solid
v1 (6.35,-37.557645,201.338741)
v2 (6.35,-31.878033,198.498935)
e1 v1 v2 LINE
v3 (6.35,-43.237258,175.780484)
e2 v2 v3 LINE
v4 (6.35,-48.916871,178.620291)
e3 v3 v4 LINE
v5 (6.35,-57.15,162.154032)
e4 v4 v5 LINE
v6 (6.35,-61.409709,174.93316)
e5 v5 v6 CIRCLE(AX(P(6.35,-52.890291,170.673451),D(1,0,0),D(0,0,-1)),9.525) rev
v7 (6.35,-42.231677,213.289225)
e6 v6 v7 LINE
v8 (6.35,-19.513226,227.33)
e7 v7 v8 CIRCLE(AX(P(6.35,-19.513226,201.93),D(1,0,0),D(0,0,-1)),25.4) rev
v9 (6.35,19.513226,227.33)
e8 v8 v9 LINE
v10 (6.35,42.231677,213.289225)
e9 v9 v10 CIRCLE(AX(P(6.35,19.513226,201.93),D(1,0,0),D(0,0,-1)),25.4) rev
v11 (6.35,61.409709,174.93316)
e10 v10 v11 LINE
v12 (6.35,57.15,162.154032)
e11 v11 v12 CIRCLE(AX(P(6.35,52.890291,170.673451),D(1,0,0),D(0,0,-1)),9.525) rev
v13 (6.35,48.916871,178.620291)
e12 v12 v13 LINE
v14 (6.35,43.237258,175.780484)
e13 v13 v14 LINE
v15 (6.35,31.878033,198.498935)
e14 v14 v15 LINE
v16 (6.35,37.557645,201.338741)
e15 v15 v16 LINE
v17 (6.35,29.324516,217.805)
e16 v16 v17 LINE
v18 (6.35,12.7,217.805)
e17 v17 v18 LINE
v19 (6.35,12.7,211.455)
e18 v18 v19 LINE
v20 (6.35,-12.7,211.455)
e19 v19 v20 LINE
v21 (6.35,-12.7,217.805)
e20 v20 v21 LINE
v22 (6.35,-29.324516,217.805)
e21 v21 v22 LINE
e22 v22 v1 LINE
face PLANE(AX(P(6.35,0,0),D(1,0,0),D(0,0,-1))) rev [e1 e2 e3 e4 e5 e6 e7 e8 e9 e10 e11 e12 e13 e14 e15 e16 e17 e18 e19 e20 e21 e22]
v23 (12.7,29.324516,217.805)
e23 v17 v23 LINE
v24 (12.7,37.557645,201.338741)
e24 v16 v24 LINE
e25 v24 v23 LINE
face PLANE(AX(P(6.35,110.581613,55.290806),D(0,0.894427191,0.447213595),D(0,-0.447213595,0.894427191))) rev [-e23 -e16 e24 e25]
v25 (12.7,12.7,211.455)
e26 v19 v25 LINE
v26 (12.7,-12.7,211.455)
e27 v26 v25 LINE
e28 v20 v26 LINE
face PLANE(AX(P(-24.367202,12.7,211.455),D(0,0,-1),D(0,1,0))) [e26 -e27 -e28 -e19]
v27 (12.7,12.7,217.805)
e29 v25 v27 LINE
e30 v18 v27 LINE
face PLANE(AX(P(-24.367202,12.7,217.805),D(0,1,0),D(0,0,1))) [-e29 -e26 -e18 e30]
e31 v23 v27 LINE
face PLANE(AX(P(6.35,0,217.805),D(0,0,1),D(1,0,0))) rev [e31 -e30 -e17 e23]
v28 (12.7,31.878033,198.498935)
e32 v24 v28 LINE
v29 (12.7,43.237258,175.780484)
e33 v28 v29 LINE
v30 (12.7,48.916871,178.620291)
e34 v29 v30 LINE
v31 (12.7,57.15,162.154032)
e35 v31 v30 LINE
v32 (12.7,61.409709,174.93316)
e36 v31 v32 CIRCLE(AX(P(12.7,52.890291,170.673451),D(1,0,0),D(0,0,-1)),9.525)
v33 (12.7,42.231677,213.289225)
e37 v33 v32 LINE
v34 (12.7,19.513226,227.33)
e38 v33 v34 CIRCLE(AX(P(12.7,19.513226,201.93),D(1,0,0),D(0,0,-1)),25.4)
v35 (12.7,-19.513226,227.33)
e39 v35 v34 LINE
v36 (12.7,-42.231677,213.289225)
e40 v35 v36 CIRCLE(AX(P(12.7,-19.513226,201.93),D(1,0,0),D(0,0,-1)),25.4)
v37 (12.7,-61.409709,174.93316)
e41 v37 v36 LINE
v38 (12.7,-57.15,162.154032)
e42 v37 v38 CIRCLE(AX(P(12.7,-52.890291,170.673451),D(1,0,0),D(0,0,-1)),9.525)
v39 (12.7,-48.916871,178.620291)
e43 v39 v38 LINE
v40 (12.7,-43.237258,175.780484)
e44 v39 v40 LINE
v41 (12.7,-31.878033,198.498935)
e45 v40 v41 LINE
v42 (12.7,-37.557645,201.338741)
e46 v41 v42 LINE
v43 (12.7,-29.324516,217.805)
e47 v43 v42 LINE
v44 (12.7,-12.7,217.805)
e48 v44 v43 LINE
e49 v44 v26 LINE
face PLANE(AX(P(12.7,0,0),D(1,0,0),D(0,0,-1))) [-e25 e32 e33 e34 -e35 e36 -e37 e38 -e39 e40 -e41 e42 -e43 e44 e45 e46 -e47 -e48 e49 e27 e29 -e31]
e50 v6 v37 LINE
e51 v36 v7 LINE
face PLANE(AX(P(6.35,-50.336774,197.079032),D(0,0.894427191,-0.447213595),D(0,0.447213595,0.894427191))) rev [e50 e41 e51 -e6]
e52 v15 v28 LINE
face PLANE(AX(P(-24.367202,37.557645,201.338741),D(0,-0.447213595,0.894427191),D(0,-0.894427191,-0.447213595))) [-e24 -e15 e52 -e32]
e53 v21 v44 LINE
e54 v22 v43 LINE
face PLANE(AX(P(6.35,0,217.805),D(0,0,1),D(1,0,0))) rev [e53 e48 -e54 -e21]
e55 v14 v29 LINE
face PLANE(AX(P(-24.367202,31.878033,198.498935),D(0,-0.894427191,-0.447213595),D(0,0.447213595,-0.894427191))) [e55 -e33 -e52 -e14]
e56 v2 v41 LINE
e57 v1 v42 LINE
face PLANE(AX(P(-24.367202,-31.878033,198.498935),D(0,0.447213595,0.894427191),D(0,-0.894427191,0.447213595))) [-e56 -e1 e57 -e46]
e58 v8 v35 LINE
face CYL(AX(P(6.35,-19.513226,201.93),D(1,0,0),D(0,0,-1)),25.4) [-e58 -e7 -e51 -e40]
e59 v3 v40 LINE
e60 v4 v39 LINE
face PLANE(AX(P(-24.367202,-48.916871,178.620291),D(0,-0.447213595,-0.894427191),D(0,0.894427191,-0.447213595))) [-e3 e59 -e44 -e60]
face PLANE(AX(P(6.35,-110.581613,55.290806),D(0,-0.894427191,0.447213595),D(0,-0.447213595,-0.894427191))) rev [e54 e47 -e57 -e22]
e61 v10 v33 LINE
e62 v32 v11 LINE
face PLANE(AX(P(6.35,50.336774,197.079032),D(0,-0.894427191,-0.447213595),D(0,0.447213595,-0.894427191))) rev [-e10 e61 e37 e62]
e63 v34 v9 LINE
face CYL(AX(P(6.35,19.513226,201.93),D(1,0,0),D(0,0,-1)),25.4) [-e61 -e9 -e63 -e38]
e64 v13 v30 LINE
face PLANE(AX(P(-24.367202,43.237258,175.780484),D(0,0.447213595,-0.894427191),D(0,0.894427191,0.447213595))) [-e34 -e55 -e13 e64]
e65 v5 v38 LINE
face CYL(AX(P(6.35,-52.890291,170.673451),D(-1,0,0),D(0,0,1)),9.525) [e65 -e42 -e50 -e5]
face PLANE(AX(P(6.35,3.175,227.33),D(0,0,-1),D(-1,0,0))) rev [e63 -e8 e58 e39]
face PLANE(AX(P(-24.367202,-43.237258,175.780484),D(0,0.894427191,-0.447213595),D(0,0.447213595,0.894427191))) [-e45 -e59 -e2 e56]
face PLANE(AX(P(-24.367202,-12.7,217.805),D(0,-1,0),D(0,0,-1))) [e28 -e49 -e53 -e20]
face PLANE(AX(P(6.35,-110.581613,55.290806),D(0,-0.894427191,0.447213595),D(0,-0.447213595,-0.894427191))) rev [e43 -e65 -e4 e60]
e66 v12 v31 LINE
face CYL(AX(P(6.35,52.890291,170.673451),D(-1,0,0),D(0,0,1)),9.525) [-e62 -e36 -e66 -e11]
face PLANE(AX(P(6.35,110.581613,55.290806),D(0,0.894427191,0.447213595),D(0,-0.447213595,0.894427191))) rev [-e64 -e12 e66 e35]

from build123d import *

# Parameters (mm, degrees)
SKETCH1_R             = 7.9375
SKETCH1_R_2           = 11.1125
BOSS_EXTRUDE1_DEPTH   = 12.7
F_8_CLEARANCE_HOLE1_D = 4.4958
SKETCH5_R             = 18.415
CUT_EXTRUDE1_DEPTH    = 218.842023092
SKETCH7_R             = 9.525
CUT_EXTRUDE2_DEPTH    = 218.842023092
CUT_EXTRUDE3_DEPTH    = 218.842023092
BOSS_EXTRUDE2_DEPTH   = 12.7
CUT_EXTRUDE4_DEPTH    = 218.842023092
SKETCH11_W            = 12.7
SKETCH11_H            = 178.054
CUT_EXTRUDE5_DEPTH    = 3.175
BOSS_EXTRUDE3_DEPTH   = 6.35
CUT_EXTRUDE6_DEPTH    = 253.498549798
FILLET1_R             = 12.7
SKETCH16_W            = 6.35
SKETCH16_H            = 25.4
BOSS_EXTRUDE4_DEPTH   = 6.35
CUT_EXTRUDE7_DEPTH    = 253.258895086
FILLET2_R             = 9.525
FILLET3_R             = 25.4


with BuildPart() as part:
    # Sketch1 → Boss-Extrude1 (new body)
    with BuildSketch(Plane(origin=(0, 0, 0), x_dir=(0, 0, -1), z_dir=(1, 0, 0))):
        with BuildLine():
            Line((93.345, 0), (55.245, 50.8))
            Line((55.245, 50.8), (-160.655, 50.8))
            ThreePointArc((-160.655, 50.8), (-211.455, 0), (-160.655, -50.8))
            Line((-160.655, -50.8), (55.245, -50.8))
            Line((55.245, -50.8), (93.345, 0))
        make_face()
        with Locations((-88.9, 0)):
            Circle(SKETCH1_R, mode=Mode.SUBTRACT)
        with Locations((-38.1, 0)):
            Circle(SKETCH1_R, mode=Mode.SUBTRACT)
        with Locations((-160.655, 0)):
            Circle(SKETCH1_R_2, mode=Mode.SUBTRACT)
        Circle(SKETCH1_R, mode=Mode.SUBTRACT)
    extrude(amount=BOSS_EXTRUDE1_DEPTH)

    # #8 Clearance Hole1 (through all)
    with Locations(Plane.ZY):
        with Locations((-17.691104559, 17.691104559), (17.691104559, 17.691104559), (17.691104559, -17.691104559), (-17.691104559, -17.691104559)):
            Hole(F_8_CLEARANCE_HOLE1_D / 2)

    # Sketch5 → Cut-Extrude1 (cut, through all)
    with BuildSketch(Plane.ZY):
        Circle(SKETCH5_R)
    extrude(amount=-CUT_EXTRUDE1_DEPTH, mode=Mode.SUBTRACT)

    # Sketch7 → Cut-Extrude2 (cut, through all)
    with BuildSketch(Plane.ZY):
        with Locations((-55.245, 0)):
            Circle(SKETCH7_R)
    extrude(amount=-CUT_EXTRUDE2_DEPTH, mode=Mode.SUBTRACT)

    # Sketch8 → Cut-Extrude3 (cut, through all)
    with BuildSketch(Plane(origin=(12.7, 0, 0), x_dir=(0, 0, -1), z_dir=(1, 0, 0))):
        Polygon((-160.655, 50.8), (-211.455, 25.4), (-211.455, -25.4), (-160.655, -50.8), (-233.239745749, -50.8), (-233.239745749, 50.8), align=None)
    extrude(amount=-CUT_EXTRUDE3_DEPTH, mode=Mode.SUBTRACT)

    # Sketch9 → Boss-Extrude2 (add)
    with BuildSketch(Plane(origin=(12.7, 0, 0), x_dir=(0, 0, -1), z_dir=(1, 0, 0))):
        Polygon((-160.655, 50.8), (-211.455, 25.4), (-211.455, 0), (-211.455, -25.4), (-160.655, -50.8), (-160.655, -40.64), (-202.749323348, 0), (-160.655, 40.64), align=None)
    extrude(amount=-BOSS_EXTRUDE2_DEPTH)

    # Sketch10 → Cut-Extrude4 (cut, through all)
    with BuildSketch(Plane.ZY):
        Polygon((-79.0575, -19.05), (-79.0575, 19.05), (-93.345, 0), align=None)
    extrude(amount=-CUT_EXTRUDE4_DEPTH, mode=Mode.SUBTRACT)

    # Sketch11 → Cut-Extrude5 (cut)
    with BuildSketch(Plane(origin=(0, 50.8, 0), x_dir=(1, 0, 0), z_dir=(0, 1, 0))):
        with Locations((6.35, -52.705)):
            Rectangle(SKETCH11_W, SKETCH11_H)
    cut_extrude5 = extrude(amount=-CUT_EXTRUDE5_DEPTH, mode=Mode.SUBTRACT)

    # Mirror1: Cut-Extrude5 across plane
    add(cut_extrude5.mirror(Plane.ZX), mode=Mode.SUBTRACT)

    # Sketch13 → Cut-Extrude6 (cut, through all)
    with BuildSketch(Plane(origin=(12.7, 0, 0), x_dir=(0, 0, -1), z_dir=(1, 0, 0))):
        Polygon((-161.254612663, -53.34), (-139.192, -53.34), (-139.192, -50.165), (33.782, -50.165), (33.782, -53.34), (56.515, -53.34), (81.5975, -19.896666667), (81.5975, 19.896666667), (56.515, 53.34), (33.782, 53.34), (33.782, 50.165), (-139.192, 50.165), (-139.192, 53.34), (-161.254612663, 53.34), (-213.995, 26.969806331), (-213.995, -26.969806331), align=None)
    extrude(amount=-CUT_EXTRUDE6_DEPTH, mode=Mode.SUBTRACT)


with BuildPart() as body_2:
    # Sketch12 → Boss-Extrude3 (new body)
    with BuildSketch(Plane(origin=(12.7, 0, 0), x_dir=(0, 0, -1), z_dir=(1, 0, 0))):
        with BuildLine():
            ThreePointArc((-211.89681554, -56.397839854), (-236.855, 0), (-211.89681554, 56.397839854))
            Line((-211.89681554, 56.397839854), (-243.205, 43.989212666))
            Line((-243.205, 43.989212666), (-243.205, -43.989212666))
            Line((-243.205, -43.989212666), (-211.89681554, -56.397839854))
        make_face()
        with BuildLine():
            Line((-217.805, 29.324515829), (-162.154031657, 57.15))
            Line((-162.154031657, 57.15), (-166.916531657, 66.675))
            Line((-166.916531657, 66.675), (-185.966531657, 66.675))
            Line((-185.966531657, 66.675), (-211.89681554, 56.397839854))
            ThreePointArc((-211.89681554, 56.397839854), (-236.855, 0), (-211.89681554, -56.397839854))
            Line((-211.89681554, -56.397839854), (-185.966531657, -66.675))
            Line((-185.966531657, -66.675), (-166.916531657, -66.675))
            Line((-166.916531657, -66.675), (-162.154031657, -57.15))
            Line((-162.154031657, -57.15), (-217.805, -29.324515829))
            Line((-217.805, -29.324515829), (-217.805, 29.324515829))
        make_face()
    extrude(amount=-BOSS_EXTRUDE3_DEPTH)

    # Fillet1
    fillet1_edges = [body_2.edges().sort_by_distance(p)[0] for p in [
        (9.525, -43.989212666, 243.205),
        (9.525, 43.989212666, 243.205),
        (9.525, 66.675, 185.966531657),
        (9.525, 66.675, 166.916531657),
        (9.525, -66.675, 166.916531657),
        (9.525, -66.675, 185.966531657),
    ]]
    fillet(fillet1_edges, radius=FILLET1_R)

    # Sketch16 → Boss-Extrude4 (add)
    with BuildSketch(Plane(origin=(12.7, 0, 0), x_dir=(0, 0, -1), z_dir=(1, 0, 0))):
        with Locations((-214.63, 0)):
            Rectangle(SKETCH16_W, SKETCH16_H)
        Polygon((-178.620290503, -48.916870577), (-175.780484171, -43.237257914), (-198.498934823, -31.878032589), (-201.338741154, -37.557645251), align=None)
        Polygon((-201.338741154, 37.557645251), (-198.498934823, 31.878032589), (-175.780484171, 43.237257914), (-178.620290503, 48.916870577), align=None)
    extrude(amount=-BOSS_EXTRUDE4_DEPTH)

    # Sketch17 → Cut-Extrude7 (cut, through all)
    with BuildSketch(Plane(origin=(12.7, 0, 0), x_dir=(0, 0, -1), z_dir=(1, 0, 0))):
        with BuildLine():
            Line((-174.765563314, 66.675), (-183.541544079, 66.675))
            ThreePointArc((-183.541544079, 66.675), (-185.923497883, 66.44962609), (-188.220911491, 65.781503319))
            Line((-188.220911491, 65.781503319), (-235.184367412, 47.168095163))
            ThreePointArc((-235.184367412, 47.168095163), (-241.010188388, 42.498188858), (-243.205, 35.361591844))
            Line((-243.205, 35.361591844), (-243.205, -35.361591844))
            ThreePointArc((-243.205, -35.361591844), (-241.010188388, -42.498188858), (-235.184367412, -47.168095163))
            Line((-235.184367412, -47.168095163), (-188.220911491, -65.781503319))
            ThreePointArc((-188.220911491, -65.781503319), (-185.923497883, -66.44962609), (-183.541544079, -66.675))
            Line((-183.541544079, -66.675), (-174.765563314, -66.675))
            ThreePointArc((-174.765563314, -66.675), (-171.322248813, -66.199303058), (-168.136883002, -64.80784807))
            Line((-168.136883002, -64.80784807), (-197.079031657, -50.336773743))
            Line((-197.079031657, -50.336773743), (-227.33, -35.211289571))
            Line((-227.33, -35.211289571), (-227.33, -3.175))
            Line((-227.33, -3.175), (-227.33, 3.175))
            Line((-227.33, 3.175), (-227.33, 35.211289571))
            Line((-227.33, 35.211289571), (-197.079031657, 50.336773743))
            Line((-197.079031657, 50.336773743), (-168.136883002, 64.80784807))
            ThreePointArc((-168.136883002, 64.80784807), (-171.322248813, 66.199303058), (-174.765563314, 66.675))
        make_face()
    extrude(amount=-CUT_EXTRUDE7_DEPTH, mode=Mode.SUBTRACT)

    # Fillet2
    # the kernel refuses this fillet: 9.525 mm, written as the material it takes off along each edge
    with BuildSketch(Plane(origin=(36.994694288, -64.80784807, 168.136883002), x_dir=(0, 0.4472135954999565, 0.8944271909999166), z_dir=(-1, 0, 0))) as fillet2_piece_1:
        with BuildLine():
            CenterArc((7.598468847, 9.525), FILLET2_R, 180, 90)
            Line((-1.926531153, 9.525), (-2.879031153, 9.525))
            ThreePointArc((-2.879031153, 9.525), (-2.879031153, 6.724757914), (-0.808010164, -0.504356844))
            Line((-0.808010164, -0.504356844), (0, -0.9525))
            Line((0, -0.9525), (7.598468847, -0.9525))
            Line((7.598468847, -0.9525), (7.598468847, 0))
        make_face()
    extrude(amount=54.939388575, mode=Mode.SUBTRACT)
    with BuildSketch(Plane(origin=(36.994694288, 64.80784807, 168.136883002), x_dir=(0, -0.447213595499958, 0.894427190999916), z_dir=(-1, 0, 0))) as fillet2_piece_2:
        with BuildLine():
            CenterArc((7.598468847, -9.525), FILLET2_R, 90, 90)
            Line((-1.926531153, -9.525), (-2.879031153, -9.525))
            ThreePointArc((-2.879031153, -9.525), (-2.879031153, -6.724757914), (-0.808010164, 0.504356844))
            Line((-0.808010164, 0.504356844), (0, 0.9525))
            Line((0, 0.9525), (7.598468847, 0.9525))
            Line((7.598468847, 0.9525), (7.598468847, 0))
        make_face()
    extrude(amount=54.939388575, mode=Mode.SUBTRACT)

    # Fillet3
    fillet3_edges = [body_2.edges().sort_by_distance(p)[0] for p in [
        (9.525, 35.211289571, 227.33),
        (9.525, -35.211289571, 227.33),
    ]]
    fillet(fillet3_edges, radius=FILLET3_R)


solid = body_2.part
